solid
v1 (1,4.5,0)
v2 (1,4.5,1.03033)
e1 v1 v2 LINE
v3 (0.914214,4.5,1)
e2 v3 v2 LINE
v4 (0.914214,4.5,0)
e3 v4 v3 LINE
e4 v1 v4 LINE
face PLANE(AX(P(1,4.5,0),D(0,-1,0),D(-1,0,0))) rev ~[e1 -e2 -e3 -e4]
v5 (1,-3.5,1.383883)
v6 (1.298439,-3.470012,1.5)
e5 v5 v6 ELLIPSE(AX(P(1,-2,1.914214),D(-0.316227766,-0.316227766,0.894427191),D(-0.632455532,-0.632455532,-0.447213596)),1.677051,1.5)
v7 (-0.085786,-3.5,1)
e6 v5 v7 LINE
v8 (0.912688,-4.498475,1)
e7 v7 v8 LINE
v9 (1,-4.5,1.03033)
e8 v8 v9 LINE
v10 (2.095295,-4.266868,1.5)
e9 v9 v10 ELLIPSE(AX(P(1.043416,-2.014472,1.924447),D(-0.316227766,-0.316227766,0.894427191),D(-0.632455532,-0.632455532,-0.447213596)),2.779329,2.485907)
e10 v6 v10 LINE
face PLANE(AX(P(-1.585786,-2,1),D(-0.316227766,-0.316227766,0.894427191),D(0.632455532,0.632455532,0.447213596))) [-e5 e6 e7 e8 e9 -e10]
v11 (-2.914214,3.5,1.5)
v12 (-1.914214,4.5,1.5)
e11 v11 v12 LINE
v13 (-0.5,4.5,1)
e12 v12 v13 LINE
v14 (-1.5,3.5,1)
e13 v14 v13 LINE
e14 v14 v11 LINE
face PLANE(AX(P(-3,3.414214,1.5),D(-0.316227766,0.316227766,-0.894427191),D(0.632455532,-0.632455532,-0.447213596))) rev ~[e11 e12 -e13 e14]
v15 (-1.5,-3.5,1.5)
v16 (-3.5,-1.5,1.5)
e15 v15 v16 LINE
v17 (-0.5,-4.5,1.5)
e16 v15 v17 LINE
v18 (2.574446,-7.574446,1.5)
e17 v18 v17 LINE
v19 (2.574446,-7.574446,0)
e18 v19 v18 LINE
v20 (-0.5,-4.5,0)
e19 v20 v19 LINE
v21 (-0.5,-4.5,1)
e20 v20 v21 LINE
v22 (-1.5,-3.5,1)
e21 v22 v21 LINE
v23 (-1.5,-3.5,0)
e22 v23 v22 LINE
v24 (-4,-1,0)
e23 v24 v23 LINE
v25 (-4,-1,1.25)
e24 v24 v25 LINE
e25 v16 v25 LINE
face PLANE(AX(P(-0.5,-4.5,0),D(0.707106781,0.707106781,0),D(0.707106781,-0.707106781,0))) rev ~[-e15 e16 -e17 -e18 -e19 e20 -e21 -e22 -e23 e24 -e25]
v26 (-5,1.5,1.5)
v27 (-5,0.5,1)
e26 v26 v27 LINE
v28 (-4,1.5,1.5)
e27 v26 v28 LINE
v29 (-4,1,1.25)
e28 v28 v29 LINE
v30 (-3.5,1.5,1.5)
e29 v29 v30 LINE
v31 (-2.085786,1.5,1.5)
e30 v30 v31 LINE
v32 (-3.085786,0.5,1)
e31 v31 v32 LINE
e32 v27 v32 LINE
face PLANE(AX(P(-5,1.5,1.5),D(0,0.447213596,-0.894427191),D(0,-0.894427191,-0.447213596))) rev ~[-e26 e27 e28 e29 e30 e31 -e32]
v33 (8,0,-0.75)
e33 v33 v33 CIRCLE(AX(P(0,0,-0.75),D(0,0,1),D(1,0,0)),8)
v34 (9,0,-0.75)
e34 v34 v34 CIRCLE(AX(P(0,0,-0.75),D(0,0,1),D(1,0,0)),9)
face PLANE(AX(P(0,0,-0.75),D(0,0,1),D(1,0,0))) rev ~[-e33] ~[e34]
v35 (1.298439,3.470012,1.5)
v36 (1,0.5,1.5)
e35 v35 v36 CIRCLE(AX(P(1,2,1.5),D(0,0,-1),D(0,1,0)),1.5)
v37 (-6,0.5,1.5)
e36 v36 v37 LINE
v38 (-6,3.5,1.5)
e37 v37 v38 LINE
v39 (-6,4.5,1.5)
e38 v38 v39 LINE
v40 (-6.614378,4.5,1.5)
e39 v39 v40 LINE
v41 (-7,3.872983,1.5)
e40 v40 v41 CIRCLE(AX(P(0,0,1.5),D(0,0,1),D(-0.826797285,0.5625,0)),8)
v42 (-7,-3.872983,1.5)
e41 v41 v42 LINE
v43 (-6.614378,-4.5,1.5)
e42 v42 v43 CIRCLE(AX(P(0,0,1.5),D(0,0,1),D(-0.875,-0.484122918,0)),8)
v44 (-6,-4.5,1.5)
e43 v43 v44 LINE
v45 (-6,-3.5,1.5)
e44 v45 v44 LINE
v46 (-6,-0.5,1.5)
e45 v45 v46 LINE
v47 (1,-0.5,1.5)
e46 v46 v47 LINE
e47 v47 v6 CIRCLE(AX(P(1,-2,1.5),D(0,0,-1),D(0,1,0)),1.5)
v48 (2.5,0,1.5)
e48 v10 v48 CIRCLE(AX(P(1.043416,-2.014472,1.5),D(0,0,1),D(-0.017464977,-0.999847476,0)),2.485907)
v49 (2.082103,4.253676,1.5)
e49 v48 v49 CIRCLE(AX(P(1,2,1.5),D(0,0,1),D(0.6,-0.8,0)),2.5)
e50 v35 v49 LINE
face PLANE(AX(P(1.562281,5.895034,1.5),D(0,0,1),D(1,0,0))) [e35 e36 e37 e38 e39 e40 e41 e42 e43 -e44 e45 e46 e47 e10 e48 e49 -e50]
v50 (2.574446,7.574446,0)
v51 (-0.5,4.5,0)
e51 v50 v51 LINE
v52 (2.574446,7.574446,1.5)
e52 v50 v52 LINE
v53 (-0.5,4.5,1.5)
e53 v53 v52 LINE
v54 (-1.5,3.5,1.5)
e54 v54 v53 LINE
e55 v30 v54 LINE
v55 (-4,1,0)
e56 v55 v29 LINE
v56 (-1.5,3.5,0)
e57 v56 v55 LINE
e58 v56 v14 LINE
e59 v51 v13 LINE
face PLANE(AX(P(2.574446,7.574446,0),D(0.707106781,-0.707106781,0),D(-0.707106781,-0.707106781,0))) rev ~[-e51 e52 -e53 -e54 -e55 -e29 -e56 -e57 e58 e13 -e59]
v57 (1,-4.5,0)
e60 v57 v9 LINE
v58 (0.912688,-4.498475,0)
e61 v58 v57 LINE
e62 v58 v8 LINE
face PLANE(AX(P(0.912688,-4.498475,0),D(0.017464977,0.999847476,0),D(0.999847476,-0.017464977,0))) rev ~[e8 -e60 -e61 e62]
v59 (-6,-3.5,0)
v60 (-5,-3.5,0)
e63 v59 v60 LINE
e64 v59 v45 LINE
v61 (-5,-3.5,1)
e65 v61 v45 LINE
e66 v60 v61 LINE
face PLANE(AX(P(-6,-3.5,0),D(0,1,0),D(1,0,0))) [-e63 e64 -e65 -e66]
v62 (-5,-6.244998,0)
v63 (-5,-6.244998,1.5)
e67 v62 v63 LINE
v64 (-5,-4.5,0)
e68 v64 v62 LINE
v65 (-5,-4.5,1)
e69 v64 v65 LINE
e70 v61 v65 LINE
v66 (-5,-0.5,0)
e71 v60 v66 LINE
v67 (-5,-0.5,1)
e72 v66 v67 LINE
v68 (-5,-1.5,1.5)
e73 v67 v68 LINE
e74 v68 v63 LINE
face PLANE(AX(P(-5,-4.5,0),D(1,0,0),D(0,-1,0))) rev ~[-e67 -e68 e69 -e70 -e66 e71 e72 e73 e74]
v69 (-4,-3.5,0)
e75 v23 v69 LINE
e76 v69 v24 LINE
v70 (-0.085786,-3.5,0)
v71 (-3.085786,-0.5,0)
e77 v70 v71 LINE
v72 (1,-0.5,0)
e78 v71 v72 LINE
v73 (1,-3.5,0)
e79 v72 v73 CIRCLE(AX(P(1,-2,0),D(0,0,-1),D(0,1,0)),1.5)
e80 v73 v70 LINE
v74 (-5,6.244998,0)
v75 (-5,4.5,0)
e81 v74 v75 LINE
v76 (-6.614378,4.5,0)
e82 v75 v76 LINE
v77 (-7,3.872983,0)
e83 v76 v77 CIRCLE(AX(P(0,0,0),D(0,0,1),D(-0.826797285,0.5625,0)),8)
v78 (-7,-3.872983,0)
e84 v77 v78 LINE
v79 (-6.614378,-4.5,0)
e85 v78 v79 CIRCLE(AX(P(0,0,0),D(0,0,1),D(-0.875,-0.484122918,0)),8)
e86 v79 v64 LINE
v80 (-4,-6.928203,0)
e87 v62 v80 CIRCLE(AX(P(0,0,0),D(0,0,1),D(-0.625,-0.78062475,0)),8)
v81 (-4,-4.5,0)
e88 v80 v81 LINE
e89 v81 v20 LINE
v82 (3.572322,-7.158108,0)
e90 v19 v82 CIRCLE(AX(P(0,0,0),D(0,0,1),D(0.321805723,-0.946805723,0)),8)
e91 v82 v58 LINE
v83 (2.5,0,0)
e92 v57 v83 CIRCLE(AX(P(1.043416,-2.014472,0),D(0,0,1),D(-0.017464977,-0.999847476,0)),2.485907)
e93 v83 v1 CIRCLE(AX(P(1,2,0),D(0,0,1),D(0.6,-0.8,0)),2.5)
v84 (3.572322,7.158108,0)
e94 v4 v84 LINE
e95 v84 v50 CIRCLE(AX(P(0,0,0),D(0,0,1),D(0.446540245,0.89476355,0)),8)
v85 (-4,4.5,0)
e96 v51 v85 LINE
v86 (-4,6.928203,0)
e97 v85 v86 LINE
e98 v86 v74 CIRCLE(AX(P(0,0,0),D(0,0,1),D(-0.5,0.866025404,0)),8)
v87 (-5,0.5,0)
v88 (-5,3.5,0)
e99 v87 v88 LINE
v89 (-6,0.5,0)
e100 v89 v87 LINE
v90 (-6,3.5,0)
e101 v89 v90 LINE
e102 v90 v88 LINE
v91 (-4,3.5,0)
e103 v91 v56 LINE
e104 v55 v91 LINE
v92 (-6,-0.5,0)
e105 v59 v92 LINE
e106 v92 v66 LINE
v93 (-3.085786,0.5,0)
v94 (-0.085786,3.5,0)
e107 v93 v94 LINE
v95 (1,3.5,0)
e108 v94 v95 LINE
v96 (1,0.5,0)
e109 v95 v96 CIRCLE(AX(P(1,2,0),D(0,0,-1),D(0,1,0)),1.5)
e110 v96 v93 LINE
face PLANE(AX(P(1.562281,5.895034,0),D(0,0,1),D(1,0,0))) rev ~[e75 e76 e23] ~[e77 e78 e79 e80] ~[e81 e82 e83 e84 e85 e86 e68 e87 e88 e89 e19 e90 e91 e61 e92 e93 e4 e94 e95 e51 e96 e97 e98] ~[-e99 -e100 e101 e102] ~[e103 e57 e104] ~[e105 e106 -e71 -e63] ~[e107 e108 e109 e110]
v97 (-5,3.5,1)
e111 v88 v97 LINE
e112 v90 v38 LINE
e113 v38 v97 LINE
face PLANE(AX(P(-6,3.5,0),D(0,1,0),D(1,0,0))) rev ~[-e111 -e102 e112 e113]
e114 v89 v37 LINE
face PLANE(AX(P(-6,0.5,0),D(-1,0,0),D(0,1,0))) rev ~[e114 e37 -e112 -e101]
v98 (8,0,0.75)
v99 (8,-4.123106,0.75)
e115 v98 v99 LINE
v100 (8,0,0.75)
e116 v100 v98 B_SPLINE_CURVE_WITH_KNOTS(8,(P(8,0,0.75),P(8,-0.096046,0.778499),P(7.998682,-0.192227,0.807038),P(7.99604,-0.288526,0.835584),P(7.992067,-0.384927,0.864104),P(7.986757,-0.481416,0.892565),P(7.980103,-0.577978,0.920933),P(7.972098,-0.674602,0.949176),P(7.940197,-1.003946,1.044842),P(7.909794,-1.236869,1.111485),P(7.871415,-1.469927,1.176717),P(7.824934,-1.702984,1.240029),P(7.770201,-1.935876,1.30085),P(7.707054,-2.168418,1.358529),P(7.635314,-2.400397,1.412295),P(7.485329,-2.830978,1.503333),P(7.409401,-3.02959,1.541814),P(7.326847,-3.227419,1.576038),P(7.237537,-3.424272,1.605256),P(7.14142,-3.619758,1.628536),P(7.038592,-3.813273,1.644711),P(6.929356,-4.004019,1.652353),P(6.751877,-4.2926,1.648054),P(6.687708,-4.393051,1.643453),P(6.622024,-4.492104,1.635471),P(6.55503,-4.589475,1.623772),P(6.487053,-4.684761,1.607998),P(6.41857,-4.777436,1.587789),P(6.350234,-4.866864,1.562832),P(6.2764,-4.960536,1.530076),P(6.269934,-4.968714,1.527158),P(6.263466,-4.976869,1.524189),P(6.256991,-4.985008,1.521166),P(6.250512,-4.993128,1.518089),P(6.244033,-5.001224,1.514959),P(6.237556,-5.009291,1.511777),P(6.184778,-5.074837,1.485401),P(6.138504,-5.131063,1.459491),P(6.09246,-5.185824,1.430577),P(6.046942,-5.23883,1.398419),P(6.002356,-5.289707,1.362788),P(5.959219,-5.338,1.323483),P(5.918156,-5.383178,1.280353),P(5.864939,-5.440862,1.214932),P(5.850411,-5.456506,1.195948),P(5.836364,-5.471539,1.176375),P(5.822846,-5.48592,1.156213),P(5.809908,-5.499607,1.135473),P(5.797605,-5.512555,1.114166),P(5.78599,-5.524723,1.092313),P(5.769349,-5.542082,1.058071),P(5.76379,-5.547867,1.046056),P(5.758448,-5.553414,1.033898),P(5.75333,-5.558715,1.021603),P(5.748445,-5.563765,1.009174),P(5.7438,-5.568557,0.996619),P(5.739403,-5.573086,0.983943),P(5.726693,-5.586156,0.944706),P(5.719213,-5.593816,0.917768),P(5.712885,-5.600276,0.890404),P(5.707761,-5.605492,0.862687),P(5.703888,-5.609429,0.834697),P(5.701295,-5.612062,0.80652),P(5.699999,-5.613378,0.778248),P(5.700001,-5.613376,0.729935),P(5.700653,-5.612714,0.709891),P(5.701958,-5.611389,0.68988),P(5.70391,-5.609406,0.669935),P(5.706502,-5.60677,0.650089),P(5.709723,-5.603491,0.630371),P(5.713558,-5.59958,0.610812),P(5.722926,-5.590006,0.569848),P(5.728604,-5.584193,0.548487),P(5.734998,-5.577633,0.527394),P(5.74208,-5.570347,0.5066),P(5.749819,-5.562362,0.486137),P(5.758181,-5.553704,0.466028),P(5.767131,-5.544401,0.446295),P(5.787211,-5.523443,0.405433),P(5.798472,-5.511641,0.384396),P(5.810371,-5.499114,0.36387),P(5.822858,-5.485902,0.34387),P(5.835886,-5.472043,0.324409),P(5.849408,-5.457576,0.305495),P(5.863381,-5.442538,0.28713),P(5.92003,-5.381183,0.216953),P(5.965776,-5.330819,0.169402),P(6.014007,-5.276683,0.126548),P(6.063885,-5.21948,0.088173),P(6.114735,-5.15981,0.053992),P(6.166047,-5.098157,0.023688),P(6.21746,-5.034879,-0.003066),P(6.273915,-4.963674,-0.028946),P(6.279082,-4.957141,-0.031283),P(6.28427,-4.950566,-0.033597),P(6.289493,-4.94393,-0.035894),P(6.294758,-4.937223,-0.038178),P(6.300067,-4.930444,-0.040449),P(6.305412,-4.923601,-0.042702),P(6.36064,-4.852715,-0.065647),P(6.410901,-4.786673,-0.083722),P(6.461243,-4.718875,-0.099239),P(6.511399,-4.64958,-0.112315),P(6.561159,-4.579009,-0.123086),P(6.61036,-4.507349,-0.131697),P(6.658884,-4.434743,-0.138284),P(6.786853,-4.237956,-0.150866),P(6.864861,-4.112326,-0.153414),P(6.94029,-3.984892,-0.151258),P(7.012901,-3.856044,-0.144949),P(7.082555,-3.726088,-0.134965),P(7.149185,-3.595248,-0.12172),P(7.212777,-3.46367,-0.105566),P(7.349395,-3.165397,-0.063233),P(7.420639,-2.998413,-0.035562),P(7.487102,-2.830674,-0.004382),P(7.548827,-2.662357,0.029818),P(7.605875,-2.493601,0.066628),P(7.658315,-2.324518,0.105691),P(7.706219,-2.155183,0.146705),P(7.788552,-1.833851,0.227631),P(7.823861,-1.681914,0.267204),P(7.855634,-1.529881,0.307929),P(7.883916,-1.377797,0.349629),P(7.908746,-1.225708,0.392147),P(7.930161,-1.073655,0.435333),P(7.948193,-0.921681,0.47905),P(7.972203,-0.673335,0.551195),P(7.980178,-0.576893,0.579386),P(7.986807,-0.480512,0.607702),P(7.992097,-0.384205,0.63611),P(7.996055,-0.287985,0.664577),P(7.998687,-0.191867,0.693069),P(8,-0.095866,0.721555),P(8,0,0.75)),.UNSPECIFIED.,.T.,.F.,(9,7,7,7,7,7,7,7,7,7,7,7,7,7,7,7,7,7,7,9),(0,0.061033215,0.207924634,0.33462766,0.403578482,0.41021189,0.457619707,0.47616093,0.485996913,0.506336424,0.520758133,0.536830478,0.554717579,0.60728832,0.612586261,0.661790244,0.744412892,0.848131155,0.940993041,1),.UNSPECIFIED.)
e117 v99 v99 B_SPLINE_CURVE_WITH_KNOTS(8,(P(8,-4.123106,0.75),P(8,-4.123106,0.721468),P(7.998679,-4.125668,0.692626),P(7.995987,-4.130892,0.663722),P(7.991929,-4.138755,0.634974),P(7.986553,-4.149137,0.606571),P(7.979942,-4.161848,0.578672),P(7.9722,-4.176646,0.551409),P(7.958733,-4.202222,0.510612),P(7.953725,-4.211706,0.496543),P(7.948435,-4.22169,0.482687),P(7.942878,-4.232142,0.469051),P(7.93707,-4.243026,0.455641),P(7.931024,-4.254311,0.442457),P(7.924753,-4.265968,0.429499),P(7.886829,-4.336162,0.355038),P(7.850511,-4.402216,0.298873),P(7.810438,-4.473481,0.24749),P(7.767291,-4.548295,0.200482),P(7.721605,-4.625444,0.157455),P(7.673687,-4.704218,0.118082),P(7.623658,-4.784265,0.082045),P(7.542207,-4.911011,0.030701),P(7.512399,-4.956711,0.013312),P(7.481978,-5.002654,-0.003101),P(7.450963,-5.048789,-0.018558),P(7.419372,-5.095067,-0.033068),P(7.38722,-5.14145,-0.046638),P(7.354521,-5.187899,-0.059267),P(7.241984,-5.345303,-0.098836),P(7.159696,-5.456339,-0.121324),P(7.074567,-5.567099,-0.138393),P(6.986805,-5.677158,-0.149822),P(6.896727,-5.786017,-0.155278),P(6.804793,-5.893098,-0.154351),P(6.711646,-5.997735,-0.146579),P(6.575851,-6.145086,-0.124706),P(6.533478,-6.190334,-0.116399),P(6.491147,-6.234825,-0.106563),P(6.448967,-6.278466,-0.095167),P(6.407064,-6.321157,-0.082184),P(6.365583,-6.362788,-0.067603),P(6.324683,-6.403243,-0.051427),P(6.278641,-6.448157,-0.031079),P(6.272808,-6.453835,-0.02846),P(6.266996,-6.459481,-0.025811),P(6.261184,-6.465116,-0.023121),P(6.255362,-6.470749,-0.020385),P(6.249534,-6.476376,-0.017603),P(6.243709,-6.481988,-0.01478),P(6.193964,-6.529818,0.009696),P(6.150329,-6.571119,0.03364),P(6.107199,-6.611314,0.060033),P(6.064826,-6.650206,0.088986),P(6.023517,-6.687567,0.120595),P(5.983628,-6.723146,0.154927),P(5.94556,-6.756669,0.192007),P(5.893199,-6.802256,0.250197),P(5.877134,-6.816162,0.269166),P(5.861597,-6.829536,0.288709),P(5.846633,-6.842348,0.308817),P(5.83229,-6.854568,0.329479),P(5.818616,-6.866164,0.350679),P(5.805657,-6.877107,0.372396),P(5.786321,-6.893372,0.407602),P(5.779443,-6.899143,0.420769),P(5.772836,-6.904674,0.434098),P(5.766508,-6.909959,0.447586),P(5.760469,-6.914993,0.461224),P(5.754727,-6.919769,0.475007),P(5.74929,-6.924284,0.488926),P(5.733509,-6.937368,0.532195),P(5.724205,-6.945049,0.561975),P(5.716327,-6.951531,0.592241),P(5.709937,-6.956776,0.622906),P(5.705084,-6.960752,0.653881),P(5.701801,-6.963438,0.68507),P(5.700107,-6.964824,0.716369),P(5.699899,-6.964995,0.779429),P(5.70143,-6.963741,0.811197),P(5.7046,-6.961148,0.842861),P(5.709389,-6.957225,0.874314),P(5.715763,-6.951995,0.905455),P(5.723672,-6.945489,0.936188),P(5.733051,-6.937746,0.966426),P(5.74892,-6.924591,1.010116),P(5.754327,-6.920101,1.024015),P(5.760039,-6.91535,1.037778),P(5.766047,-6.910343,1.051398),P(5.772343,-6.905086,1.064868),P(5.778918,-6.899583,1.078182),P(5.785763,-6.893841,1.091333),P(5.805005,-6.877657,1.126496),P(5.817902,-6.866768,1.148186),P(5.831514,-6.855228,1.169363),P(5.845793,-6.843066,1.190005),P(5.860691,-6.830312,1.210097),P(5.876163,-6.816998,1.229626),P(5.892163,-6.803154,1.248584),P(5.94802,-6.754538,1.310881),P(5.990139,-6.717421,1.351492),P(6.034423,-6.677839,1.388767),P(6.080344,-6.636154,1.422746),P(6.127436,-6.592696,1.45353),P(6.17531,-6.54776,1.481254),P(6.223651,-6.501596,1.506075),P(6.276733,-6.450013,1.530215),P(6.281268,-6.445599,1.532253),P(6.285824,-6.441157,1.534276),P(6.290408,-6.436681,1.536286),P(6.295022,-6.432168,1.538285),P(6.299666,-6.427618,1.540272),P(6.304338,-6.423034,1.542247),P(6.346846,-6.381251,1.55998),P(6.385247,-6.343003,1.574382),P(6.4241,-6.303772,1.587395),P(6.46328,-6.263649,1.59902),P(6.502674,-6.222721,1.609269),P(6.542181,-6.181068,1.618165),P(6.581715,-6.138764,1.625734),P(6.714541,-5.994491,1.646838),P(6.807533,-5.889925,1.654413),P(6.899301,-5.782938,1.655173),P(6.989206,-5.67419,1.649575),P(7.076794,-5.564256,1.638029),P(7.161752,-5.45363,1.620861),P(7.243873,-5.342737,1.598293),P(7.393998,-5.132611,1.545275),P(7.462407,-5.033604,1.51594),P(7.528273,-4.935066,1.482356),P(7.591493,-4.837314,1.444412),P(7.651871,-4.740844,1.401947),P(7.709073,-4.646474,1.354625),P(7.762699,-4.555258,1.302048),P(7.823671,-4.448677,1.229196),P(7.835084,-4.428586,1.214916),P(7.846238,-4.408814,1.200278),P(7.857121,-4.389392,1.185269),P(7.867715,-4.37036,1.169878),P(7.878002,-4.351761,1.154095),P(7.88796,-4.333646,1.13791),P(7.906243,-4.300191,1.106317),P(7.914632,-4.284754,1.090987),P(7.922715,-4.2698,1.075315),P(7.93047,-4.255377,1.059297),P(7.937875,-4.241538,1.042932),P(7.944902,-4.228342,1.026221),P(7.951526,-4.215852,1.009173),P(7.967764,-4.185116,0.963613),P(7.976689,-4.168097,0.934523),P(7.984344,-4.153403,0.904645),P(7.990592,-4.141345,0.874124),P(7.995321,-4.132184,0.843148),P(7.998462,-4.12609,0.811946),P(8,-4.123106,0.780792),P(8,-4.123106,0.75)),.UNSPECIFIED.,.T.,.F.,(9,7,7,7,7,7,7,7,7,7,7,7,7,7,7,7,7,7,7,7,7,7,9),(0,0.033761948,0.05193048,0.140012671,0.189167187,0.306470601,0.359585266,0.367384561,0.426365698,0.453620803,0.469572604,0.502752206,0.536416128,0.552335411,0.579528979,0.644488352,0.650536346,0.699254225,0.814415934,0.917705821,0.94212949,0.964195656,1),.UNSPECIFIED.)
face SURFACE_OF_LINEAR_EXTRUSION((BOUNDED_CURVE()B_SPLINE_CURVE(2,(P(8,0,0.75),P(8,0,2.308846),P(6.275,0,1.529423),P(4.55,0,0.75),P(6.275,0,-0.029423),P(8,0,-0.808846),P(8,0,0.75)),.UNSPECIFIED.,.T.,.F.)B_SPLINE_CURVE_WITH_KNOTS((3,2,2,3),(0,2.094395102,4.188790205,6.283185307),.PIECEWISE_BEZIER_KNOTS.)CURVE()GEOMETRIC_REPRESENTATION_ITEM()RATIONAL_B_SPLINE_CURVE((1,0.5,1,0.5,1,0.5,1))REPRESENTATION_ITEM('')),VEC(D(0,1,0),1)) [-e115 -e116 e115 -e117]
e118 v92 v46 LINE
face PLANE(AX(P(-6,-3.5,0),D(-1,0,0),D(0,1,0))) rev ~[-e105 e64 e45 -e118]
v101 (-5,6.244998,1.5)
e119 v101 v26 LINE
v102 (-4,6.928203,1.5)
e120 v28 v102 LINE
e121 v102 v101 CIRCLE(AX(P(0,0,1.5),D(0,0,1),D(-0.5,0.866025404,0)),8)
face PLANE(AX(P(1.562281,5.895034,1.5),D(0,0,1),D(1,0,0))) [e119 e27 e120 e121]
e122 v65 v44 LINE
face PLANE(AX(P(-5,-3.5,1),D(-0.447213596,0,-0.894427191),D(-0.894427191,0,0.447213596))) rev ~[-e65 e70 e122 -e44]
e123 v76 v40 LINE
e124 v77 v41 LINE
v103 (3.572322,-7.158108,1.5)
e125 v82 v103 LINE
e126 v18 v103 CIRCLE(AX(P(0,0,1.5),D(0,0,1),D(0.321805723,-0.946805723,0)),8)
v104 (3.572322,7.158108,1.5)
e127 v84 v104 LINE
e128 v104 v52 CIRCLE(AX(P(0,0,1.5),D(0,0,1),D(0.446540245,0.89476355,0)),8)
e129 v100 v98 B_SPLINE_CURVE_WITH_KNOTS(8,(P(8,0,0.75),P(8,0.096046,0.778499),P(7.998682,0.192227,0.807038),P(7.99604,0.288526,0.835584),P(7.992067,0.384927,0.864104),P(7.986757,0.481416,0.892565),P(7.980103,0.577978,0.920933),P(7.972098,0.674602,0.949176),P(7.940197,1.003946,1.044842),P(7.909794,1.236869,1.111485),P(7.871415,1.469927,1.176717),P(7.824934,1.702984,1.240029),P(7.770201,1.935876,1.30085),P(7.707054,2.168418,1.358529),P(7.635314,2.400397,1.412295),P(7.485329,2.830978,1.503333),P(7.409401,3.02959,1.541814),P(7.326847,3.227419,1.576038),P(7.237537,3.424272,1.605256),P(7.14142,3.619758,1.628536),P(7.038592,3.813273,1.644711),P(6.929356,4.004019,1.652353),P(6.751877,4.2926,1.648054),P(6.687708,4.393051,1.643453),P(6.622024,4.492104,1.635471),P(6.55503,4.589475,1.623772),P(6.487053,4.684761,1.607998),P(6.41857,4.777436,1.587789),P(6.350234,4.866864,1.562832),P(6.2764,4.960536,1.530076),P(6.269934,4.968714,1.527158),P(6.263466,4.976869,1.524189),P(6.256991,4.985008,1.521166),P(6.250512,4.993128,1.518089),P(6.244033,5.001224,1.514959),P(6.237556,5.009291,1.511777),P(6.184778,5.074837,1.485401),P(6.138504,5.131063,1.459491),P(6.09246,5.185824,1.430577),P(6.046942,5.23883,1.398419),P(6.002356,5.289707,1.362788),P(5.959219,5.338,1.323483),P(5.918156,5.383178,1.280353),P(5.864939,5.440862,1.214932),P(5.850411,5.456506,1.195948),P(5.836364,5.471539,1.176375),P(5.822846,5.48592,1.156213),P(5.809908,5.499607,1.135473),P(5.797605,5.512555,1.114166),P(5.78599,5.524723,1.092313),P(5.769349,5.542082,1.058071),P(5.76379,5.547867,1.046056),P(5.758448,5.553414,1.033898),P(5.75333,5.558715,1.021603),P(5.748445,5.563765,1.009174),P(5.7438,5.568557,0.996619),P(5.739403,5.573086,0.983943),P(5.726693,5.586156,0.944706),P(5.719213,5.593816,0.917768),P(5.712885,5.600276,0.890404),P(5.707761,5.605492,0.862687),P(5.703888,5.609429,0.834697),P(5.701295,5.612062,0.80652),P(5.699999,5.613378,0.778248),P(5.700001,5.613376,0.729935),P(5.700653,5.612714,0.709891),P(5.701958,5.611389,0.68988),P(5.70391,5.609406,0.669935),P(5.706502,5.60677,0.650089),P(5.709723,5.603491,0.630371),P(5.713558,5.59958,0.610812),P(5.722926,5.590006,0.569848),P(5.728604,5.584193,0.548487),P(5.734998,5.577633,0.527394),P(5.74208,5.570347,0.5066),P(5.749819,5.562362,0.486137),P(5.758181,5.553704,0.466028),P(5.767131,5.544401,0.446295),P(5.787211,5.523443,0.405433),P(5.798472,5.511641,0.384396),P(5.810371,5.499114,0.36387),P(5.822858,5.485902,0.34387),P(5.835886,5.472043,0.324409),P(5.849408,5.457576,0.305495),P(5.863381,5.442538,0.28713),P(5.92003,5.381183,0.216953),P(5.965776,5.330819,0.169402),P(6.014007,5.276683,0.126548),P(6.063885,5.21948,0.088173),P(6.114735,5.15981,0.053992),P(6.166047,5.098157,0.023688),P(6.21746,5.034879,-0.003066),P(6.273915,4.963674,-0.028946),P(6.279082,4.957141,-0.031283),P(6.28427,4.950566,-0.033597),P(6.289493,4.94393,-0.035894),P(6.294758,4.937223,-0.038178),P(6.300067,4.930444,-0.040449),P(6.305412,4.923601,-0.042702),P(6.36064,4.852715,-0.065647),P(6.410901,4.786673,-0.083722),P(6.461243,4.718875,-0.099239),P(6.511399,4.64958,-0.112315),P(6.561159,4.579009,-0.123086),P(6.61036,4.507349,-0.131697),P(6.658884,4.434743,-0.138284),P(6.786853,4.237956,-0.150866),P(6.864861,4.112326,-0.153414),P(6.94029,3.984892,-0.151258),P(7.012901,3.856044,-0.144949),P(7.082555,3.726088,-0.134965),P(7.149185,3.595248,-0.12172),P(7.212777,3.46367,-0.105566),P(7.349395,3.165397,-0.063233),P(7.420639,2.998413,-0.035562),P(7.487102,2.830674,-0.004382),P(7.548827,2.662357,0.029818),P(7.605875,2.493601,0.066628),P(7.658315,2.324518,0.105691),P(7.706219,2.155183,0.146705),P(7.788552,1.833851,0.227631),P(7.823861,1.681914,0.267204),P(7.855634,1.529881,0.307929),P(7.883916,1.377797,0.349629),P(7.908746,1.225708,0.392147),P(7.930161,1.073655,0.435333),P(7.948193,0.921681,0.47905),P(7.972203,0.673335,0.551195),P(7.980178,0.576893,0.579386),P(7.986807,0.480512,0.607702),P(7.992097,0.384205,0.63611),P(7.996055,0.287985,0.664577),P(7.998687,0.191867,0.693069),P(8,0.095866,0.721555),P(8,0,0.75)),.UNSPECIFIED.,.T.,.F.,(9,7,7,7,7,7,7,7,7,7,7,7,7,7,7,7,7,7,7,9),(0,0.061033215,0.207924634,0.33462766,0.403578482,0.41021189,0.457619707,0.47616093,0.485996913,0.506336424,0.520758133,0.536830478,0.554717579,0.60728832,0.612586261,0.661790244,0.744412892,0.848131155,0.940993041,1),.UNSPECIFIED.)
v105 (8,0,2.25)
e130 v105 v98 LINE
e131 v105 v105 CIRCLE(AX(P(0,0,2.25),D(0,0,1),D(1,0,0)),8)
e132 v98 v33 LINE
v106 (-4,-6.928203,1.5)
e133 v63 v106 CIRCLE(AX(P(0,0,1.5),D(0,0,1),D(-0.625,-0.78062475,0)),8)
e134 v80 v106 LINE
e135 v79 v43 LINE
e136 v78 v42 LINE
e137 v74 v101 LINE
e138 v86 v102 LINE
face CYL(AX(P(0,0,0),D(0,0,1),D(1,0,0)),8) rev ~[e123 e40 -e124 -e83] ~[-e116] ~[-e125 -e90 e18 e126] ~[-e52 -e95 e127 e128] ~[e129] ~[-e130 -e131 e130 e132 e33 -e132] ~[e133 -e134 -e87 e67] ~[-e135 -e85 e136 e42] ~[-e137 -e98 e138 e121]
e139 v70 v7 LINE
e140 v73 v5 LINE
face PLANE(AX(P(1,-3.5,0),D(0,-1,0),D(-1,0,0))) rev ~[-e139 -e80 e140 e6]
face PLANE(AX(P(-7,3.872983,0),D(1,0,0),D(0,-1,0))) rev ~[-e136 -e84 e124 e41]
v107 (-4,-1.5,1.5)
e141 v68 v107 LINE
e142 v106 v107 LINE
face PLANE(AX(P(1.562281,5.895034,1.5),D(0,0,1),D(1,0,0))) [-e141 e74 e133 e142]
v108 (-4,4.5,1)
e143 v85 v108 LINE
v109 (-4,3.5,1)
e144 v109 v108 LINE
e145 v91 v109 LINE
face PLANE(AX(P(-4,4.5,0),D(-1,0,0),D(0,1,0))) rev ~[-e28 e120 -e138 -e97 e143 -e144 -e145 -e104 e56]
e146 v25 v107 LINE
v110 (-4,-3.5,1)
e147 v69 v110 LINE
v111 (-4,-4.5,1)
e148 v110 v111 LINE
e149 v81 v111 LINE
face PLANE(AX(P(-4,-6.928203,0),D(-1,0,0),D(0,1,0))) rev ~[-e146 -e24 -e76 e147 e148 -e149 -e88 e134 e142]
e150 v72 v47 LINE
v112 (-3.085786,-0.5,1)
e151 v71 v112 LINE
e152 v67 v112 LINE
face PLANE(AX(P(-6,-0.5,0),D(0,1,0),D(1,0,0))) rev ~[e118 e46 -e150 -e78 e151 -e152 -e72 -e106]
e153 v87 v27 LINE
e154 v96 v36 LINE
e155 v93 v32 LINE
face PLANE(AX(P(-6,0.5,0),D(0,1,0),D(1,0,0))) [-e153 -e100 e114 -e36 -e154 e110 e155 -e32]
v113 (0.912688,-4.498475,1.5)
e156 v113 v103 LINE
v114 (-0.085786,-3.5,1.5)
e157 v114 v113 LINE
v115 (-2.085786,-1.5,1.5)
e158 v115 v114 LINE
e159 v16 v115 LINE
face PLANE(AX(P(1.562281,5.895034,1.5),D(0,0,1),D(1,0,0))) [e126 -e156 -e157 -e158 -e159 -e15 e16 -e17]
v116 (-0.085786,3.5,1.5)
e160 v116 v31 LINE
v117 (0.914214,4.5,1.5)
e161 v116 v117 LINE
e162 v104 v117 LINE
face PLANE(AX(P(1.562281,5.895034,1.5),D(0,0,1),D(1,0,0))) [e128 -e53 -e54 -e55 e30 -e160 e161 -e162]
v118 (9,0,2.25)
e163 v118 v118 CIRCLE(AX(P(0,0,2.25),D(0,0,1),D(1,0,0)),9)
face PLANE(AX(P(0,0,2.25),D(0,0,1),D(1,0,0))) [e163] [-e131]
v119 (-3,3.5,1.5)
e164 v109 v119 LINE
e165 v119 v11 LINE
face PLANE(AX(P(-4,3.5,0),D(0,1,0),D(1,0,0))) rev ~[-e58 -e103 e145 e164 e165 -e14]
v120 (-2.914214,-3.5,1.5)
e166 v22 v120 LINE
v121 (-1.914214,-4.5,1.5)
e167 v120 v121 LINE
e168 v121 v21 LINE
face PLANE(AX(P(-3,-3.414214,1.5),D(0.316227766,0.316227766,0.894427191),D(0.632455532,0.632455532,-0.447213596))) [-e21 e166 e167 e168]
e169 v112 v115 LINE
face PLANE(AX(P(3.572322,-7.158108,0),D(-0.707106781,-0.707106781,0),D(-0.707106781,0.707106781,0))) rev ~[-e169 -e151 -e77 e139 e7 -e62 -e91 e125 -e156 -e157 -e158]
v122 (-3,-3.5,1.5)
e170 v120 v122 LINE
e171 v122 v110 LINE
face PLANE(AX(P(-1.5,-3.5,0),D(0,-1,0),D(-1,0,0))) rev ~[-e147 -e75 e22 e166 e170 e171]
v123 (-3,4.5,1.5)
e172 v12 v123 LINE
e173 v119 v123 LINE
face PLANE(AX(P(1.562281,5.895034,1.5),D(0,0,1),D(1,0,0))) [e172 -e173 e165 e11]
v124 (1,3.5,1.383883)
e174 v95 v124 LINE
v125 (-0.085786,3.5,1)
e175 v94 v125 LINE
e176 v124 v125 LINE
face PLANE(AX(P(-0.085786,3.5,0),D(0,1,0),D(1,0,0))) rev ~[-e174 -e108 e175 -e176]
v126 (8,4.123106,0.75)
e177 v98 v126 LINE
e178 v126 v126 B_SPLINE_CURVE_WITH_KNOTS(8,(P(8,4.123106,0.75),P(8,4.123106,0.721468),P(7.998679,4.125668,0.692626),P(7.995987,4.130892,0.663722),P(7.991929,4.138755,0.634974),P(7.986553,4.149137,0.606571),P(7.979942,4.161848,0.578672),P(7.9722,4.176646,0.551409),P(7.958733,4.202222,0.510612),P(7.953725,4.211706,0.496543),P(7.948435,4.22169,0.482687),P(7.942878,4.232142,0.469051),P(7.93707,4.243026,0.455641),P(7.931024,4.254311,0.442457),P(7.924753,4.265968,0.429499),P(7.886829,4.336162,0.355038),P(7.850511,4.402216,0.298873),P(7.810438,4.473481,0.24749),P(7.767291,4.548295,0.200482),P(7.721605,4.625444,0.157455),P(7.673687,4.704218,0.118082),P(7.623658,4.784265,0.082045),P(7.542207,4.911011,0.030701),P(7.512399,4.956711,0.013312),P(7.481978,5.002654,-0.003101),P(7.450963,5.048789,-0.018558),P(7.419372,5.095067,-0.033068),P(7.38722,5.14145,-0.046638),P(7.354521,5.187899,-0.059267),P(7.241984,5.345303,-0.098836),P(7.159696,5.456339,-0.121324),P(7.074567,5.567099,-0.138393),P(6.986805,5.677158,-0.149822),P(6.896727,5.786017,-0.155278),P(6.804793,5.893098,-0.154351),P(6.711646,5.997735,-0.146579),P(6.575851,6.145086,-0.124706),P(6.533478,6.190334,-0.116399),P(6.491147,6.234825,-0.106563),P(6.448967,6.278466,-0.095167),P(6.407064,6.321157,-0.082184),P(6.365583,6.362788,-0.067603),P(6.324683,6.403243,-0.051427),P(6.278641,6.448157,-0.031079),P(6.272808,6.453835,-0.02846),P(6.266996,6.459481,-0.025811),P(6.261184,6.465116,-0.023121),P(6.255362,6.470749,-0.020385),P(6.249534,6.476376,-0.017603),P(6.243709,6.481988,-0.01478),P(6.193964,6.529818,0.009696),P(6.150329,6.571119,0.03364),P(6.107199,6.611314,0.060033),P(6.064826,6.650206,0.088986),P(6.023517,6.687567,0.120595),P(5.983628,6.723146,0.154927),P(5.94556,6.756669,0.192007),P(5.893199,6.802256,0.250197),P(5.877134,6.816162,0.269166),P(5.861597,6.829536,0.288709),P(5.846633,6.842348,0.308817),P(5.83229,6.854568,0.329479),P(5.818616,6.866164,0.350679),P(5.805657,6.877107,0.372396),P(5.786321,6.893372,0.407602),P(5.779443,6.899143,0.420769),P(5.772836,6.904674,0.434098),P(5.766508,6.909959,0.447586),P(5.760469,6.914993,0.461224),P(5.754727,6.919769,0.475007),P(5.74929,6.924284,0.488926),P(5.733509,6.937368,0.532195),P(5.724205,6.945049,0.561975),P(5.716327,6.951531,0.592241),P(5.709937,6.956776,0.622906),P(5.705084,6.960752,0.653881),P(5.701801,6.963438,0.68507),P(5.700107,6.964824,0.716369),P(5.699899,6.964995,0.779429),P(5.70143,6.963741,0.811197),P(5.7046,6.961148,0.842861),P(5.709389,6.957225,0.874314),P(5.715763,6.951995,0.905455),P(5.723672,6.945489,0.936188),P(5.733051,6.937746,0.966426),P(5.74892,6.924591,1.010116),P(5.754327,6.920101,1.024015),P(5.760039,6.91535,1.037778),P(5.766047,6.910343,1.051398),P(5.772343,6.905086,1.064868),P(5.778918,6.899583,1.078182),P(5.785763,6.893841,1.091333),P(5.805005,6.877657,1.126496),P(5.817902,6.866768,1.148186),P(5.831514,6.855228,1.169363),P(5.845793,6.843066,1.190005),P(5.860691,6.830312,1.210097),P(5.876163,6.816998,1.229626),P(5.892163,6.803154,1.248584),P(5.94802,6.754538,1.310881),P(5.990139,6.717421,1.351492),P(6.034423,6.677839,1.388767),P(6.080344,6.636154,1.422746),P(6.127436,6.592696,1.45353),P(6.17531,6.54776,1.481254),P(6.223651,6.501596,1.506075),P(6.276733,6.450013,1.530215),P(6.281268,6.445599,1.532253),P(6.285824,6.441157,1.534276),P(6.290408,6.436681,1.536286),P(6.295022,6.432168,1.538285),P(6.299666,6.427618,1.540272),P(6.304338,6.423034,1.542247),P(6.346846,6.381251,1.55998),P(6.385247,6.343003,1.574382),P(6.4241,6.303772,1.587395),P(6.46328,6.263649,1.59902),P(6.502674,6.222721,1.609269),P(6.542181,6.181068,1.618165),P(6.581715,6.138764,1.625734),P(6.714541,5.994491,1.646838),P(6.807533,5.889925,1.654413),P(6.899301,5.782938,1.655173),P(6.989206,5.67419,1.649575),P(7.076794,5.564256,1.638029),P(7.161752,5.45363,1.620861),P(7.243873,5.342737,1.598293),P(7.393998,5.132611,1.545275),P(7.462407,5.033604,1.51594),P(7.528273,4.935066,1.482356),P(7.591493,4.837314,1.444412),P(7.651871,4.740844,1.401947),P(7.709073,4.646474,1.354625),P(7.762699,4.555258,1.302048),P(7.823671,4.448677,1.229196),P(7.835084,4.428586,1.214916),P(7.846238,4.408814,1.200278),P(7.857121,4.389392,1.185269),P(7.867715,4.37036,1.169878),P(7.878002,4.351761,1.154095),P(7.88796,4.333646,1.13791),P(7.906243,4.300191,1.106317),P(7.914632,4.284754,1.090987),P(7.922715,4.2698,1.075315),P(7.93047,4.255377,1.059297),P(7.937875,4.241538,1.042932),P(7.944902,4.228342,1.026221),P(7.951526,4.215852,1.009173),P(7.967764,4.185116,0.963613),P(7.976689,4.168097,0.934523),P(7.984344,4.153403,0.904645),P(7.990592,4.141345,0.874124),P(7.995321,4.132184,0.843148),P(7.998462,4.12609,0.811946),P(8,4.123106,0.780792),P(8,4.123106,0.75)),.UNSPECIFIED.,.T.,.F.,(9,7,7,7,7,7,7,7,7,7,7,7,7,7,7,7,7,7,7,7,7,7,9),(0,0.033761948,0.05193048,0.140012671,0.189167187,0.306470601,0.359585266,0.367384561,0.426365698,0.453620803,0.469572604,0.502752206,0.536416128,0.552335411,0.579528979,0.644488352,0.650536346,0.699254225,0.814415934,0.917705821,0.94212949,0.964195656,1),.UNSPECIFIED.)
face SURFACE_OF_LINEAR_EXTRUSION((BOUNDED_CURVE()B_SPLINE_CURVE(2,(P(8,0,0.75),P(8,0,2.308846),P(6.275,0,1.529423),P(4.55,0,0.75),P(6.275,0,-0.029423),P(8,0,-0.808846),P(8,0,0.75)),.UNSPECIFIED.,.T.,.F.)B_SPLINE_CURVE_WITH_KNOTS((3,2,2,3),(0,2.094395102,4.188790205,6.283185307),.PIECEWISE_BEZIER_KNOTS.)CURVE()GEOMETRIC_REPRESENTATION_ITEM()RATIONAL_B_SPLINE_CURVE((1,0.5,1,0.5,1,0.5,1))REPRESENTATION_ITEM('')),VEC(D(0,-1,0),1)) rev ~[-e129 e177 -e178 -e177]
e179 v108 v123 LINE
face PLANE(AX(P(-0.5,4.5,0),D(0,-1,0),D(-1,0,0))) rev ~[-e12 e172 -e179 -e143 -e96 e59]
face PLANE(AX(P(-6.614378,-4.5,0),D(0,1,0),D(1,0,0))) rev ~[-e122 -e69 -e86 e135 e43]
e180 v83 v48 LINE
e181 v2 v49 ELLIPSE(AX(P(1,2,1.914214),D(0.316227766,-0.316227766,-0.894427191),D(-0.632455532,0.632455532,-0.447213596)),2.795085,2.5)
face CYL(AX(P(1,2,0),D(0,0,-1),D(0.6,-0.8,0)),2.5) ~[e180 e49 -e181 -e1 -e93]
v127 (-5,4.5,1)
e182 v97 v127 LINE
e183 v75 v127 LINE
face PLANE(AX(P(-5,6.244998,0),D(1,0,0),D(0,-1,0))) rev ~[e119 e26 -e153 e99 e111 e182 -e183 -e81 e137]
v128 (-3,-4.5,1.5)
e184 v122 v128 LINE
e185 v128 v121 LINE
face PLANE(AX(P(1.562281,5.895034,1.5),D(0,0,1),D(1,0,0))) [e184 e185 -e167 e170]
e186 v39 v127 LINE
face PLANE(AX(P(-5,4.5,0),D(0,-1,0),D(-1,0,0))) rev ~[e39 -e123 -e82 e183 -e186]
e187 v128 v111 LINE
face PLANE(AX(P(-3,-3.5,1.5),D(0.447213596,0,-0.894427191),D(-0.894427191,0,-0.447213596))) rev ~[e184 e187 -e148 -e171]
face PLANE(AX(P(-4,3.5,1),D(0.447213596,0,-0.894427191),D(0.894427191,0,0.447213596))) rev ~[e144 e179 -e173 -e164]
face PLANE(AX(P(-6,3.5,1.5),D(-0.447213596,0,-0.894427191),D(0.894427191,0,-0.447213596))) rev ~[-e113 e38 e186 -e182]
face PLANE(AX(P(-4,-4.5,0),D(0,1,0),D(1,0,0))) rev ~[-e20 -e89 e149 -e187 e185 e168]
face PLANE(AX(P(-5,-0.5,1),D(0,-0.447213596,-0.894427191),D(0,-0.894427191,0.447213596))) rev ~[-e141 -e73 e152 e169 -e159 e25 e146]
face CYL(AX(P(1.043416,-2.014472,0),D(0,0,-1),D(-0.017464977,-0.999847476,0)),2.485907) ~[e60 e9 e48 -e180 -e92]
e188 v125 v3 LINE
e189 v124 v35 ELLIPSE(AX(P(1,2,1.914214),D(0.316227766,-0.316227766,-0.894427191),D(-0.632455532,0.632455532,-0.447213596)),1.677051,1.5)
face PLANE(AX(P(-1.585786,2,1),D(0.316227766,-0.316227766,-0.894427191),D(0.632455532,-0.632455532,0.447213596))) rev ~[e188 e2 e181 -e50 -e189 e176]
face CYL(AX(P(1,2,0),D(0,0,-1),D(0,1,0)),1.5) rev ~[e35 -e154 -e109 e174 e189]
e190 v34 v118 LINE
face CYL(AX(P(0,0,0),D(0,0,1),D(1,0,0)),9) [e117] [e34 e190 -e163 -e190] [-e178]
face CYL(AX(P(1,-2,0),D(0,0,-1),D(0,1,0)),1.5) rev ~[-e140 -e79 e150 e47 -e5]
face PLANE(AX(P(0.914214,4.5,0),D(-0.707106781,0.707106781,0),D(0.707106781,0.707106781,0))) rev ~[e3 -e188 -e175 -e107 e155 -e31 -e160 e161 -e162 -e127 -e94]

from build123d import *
from build123d import SkipClean  # not in build123d's __all__

# Parameters (mm, degrees)
F1_R          = 9
F1_R_2        = 8
F2_DEPTH      = 2.25
F2_DEPTH_BACK = 0.75
F0_W          = 1
F0_H          = 3
F3_DEPTH      = 1.5
F7_DEPTH      = 25
F7_DEPTH_BACK = 25
F9_DEPTH      = 1
F11_DEPTH     = 1
F13_DEPTH     = 1
F15_DEPTH     = 1
F17_DEPTH     = 3
F19_DEPTH     = 3
F21_DEPTH     = 5
F23_DEPTH     = 5


with BuildPart() as f2:
    # F1 (on Top) → F2 (new body, two sides)
    with BuildSketch(Plane.XY) as f2_sk:
        Circle(F1_R)
        Circle(F1_R_2, mode=Mode.SUBTRACT)
    extrude(amount=F2_DEPTH)
    extrude(f2_sk.sketch, amount=-F2_DEPTH_BACK)

    # F0 (on Top) → F3 (join)
    with BuildSketch(Plane.XY):
        with BuildLine():
            Line((0.9142135624, 4.5), (3.5723219592, 7.1581083968))
            ThreePointArc((3.5723219592, 7.1581083968), (3.080425721, 7.3831549745), (2.5744457825, 7.5744457825))
            Line((2.5744457825, 7.5744457825), (-0.5, 4.5))
            Line((-0.5, 4.5), (0.9142135624, 4.5))
        make_face()
        with BuildLine():
            ThreePointArc((2.5744457825, -7.5744457825), (3.080425721, -7.3831549745), (3.5723219592, -7.1581083968))
            Line((3.5723219592, -7.1581083968), (0.9126884353, -4.4984748729))
            Line((0.9126884353, -4.4984748729), (1, -4.5))
            ThreePointArc((1, -4.5), (3.4017548158, -2.8005849386), (2.5, 0))
            ThreePointArc((2.5, 0), (3.3717082451, 2.790569415), (1, 4.5))
            Line((1, 4.5), (0.9142135624, 4.5))
            Line((0.9142135624, 4.5), (-0.5, 4.5))
            Line((-0.5, 4.5), (-4, 4.5))
            Line((-4, 4.5), (-4, 6.9282032303))
            ThreePointArc((-4, 6.9282032303), (-4.5129471908, 6.6055512755), (-5, 6.2449979984))
            Line((-5, 6.2449979984), (-5, 4.5))
            Line((-5, 4.5), (-6.6143782777, 4.5))
            ThreePointArc((-6.6143782777, 4.5), (-6.814404702, 4.190929319), (-7, 3.8729833462))
            Line((-7, 3.8729833462), (-7, -3.8729833462))
            ThreePointArc((-7, -3.8729833462), (-6.814404702, -4.190929319), (-6.6143782777, -4.5))
            Line((-6.6143782777, -4.5), (-5, -4.5))
            Line((-5, -4.5), (-5, -6.2449979984))
            ThreePointArc((-5, -6.2449979984), (-4.5129471908, -6.6055512755), (-4, -6.9282032303))
            Line((-4, -6.9282032303), (-4, -4.5))
            Line((-4, -4.5), (-0.5, -4.5))
            Line((-0.5, -4.5), (2.5744457825, -7.5744457825))
        make_face()
        with Locations((-5.5, -2)):
            Rectangle(F0_W, F0_H, mode=Mode.SUBTRACT)
        Polygon((-4, -3.5), (-4, -1), (-1.5, -3.5), align=None, mode=Mode.SUBTRACT)
        with BuildLine():
            Line((-3.0857864376, -0.5), (1, -0.5))
            ThreePointArc((1, -0.5), (2.5, -2), (1, -3.5))
            Line((1, -3.5), (-0.0857864376, -3.5))
            Line((-0.0857864376, -3.5), (-3.0857864376, -0.5))
        make_face(mode=Mode.SUBTRACT)
        with Locations((-5.5, 2)):
            Rectangle(F0_W, F0_H, mode=Mode.SUBTRACT)
        Polygon((-4, 3.5), (-1.5, 3.5), (-4, 1), align=None, mode=Mode.SUBTRACT)
        with BuildLine():
            Line((-0.0857864376, 3.5), (1, 3.5))
            ThreePointArc((1, 3.5), (2.5, 2), (1, 0.5))
            Line((1, 0.5), (-3.0857864376, 0.5))
            Line((-3.0857864376, 0.5), (-0.0857864376, 3.5))
        make_face(mode=Mode.SUBTRACT)
    extrude(amount=F3_DEPTH)

    # F6 (on Front) → F7 (cut, two sides)
    with BuildSketch(Plane.XZ) as f7_sk:
        with BuildLine():
            add(Edge.make_bspline(
                [(8, 0.75), (8, 2.3088457268), (6.275, 1.5294228634), (4.55, 0.75), (6.275, -0.0294228634), (8, -0.8088457268), (8, 0.75)],
                knots=[0, 0, 0, 2.0943951024, 2.0943951024, 4.1887902048, 4.1887902048, 6.2831853072, 6.2831853072, 6.2831853072], degree=2, weights=[1, 0.5, 1, 0.5, 1, 0.5, 1]))
        make_face()
    with SkipClean():  # cleaning this boolean's faces spoils the solid; the shape is the same uncleaned
        extrude(amount=F7_DEPTH, mode=Mode.SUBTRACT)
        extrude(f7_sk.sketch, amount=-F7_DEPTH_BACK, mode=Mode.SUBTRACT)

    # F8 (on face) → F9 (cut)
    with BuildSketch(Plane.XZ.offset(-3.5)):
        Polygon((-4, 1.5), (-4, 1), (-3, 1.5), align=None)
    extrude(amount=-F9_DEPTH, mode=Mode.SUBTRACT)

    # F10 (on face) → F11 (cut)
    with BuildSketch(Plane.XZ.offset(-3.5)):
        Polygon((-6, 1.5), (-5, 1), (-5, 1.5), align=None)
    extrude(amount=-F11_DEPTH, mode=Mode.SUBTRACT)

    # F12 (on face) → F13 (cut)
    with BuildSketch(Plane(origin=(0, -3.5, 0), x_dir=(-1, 0, 0), z_dir=(0, 1, 0))):
        Polygon((5, 1.5), (5, 1), (6, 1.5), align=None)
    extrude(amount=-F13_DEPTH, mode=Mode.SUBTRACT)

    # F14 (on face) → F15 (cut)
    with BuildSketch(Plane(origin=(0, -3.5, 0), x_dir=(-1, 0, 0), z_dir=(0, 1, 0))):
        Polygon((3, 1.5), (4, 1), (4, 1.5), align=None)
    extrude(amount=-F15_DEPTH, mode=Mode.SUBTRACT)

    # F16 (on face) → F17 (cut)
    with BuildSketch(Plane(origin=(-5, 0, 0), x_dir=(0, -1, 0), z_dir=(-1, 0, 0))):
        Polygon((-0.5, 1.5), (-1.5, 1.5), (-0.5, 1), align=None)
    extrude(amount=-F17_DEPTH, mode=Mode.SUBTRACT)

    # F18 (on face) → F19 (cut)
    with BuildSketch(Plane(origin=(-5, 0, 0), x_dir=(0, -1, 0), z_dir=(-1, 0, 0))):
        Polygon((0.5, 1.5), (0.5, 1), (1.5, 1.5), align=None)
    extrude(amount=-F19_DEPTH, mode=Mode.SUBTRACT)

    # F20 (on face) → F21 (cut)
    with BuildSketch(Plane(origin=(0.2071067812, 0.2071067812, 0), x_dir=(0.7071067812, -0.7071067812, 0), z_dir=(-0.7071067812, -0.7071067812, 0))):
        Polygon((-3.5355339059, 1.5), (-4.5355339059, 1.5), (-3.5355339059, 1), align=None)
        Polygon((-2.5355339059, 1), (-1.5355339059, 1.5), (-2.5355339059, 1.5), align=None)
    extrude(amount=-F21_DEPTH, mode=Mode.SUBTRACT)

    # F22 (on face) → F23 (cut)
    with BuildSketch(Plane(origin=(0.2071067812, -0.2071067812, 0), x_dir=(0.7071067812, 0.7071067812, 0), z_dir=(0.7071067812, -0.7071067812, 0))):
        Polygon((-2.5355339059, 1), (-1.5355339059, 1.5), (-2.5355339059, 1.5), align=None)
        Polygon((-3.5355339059, 1.5), (-4.5355339059, 1.5), (-3.5355339059, 1), align=None)
    extrude(amount=F23_DEPTH, mode=Mode.SUBTRACT)


solid = f2.part
